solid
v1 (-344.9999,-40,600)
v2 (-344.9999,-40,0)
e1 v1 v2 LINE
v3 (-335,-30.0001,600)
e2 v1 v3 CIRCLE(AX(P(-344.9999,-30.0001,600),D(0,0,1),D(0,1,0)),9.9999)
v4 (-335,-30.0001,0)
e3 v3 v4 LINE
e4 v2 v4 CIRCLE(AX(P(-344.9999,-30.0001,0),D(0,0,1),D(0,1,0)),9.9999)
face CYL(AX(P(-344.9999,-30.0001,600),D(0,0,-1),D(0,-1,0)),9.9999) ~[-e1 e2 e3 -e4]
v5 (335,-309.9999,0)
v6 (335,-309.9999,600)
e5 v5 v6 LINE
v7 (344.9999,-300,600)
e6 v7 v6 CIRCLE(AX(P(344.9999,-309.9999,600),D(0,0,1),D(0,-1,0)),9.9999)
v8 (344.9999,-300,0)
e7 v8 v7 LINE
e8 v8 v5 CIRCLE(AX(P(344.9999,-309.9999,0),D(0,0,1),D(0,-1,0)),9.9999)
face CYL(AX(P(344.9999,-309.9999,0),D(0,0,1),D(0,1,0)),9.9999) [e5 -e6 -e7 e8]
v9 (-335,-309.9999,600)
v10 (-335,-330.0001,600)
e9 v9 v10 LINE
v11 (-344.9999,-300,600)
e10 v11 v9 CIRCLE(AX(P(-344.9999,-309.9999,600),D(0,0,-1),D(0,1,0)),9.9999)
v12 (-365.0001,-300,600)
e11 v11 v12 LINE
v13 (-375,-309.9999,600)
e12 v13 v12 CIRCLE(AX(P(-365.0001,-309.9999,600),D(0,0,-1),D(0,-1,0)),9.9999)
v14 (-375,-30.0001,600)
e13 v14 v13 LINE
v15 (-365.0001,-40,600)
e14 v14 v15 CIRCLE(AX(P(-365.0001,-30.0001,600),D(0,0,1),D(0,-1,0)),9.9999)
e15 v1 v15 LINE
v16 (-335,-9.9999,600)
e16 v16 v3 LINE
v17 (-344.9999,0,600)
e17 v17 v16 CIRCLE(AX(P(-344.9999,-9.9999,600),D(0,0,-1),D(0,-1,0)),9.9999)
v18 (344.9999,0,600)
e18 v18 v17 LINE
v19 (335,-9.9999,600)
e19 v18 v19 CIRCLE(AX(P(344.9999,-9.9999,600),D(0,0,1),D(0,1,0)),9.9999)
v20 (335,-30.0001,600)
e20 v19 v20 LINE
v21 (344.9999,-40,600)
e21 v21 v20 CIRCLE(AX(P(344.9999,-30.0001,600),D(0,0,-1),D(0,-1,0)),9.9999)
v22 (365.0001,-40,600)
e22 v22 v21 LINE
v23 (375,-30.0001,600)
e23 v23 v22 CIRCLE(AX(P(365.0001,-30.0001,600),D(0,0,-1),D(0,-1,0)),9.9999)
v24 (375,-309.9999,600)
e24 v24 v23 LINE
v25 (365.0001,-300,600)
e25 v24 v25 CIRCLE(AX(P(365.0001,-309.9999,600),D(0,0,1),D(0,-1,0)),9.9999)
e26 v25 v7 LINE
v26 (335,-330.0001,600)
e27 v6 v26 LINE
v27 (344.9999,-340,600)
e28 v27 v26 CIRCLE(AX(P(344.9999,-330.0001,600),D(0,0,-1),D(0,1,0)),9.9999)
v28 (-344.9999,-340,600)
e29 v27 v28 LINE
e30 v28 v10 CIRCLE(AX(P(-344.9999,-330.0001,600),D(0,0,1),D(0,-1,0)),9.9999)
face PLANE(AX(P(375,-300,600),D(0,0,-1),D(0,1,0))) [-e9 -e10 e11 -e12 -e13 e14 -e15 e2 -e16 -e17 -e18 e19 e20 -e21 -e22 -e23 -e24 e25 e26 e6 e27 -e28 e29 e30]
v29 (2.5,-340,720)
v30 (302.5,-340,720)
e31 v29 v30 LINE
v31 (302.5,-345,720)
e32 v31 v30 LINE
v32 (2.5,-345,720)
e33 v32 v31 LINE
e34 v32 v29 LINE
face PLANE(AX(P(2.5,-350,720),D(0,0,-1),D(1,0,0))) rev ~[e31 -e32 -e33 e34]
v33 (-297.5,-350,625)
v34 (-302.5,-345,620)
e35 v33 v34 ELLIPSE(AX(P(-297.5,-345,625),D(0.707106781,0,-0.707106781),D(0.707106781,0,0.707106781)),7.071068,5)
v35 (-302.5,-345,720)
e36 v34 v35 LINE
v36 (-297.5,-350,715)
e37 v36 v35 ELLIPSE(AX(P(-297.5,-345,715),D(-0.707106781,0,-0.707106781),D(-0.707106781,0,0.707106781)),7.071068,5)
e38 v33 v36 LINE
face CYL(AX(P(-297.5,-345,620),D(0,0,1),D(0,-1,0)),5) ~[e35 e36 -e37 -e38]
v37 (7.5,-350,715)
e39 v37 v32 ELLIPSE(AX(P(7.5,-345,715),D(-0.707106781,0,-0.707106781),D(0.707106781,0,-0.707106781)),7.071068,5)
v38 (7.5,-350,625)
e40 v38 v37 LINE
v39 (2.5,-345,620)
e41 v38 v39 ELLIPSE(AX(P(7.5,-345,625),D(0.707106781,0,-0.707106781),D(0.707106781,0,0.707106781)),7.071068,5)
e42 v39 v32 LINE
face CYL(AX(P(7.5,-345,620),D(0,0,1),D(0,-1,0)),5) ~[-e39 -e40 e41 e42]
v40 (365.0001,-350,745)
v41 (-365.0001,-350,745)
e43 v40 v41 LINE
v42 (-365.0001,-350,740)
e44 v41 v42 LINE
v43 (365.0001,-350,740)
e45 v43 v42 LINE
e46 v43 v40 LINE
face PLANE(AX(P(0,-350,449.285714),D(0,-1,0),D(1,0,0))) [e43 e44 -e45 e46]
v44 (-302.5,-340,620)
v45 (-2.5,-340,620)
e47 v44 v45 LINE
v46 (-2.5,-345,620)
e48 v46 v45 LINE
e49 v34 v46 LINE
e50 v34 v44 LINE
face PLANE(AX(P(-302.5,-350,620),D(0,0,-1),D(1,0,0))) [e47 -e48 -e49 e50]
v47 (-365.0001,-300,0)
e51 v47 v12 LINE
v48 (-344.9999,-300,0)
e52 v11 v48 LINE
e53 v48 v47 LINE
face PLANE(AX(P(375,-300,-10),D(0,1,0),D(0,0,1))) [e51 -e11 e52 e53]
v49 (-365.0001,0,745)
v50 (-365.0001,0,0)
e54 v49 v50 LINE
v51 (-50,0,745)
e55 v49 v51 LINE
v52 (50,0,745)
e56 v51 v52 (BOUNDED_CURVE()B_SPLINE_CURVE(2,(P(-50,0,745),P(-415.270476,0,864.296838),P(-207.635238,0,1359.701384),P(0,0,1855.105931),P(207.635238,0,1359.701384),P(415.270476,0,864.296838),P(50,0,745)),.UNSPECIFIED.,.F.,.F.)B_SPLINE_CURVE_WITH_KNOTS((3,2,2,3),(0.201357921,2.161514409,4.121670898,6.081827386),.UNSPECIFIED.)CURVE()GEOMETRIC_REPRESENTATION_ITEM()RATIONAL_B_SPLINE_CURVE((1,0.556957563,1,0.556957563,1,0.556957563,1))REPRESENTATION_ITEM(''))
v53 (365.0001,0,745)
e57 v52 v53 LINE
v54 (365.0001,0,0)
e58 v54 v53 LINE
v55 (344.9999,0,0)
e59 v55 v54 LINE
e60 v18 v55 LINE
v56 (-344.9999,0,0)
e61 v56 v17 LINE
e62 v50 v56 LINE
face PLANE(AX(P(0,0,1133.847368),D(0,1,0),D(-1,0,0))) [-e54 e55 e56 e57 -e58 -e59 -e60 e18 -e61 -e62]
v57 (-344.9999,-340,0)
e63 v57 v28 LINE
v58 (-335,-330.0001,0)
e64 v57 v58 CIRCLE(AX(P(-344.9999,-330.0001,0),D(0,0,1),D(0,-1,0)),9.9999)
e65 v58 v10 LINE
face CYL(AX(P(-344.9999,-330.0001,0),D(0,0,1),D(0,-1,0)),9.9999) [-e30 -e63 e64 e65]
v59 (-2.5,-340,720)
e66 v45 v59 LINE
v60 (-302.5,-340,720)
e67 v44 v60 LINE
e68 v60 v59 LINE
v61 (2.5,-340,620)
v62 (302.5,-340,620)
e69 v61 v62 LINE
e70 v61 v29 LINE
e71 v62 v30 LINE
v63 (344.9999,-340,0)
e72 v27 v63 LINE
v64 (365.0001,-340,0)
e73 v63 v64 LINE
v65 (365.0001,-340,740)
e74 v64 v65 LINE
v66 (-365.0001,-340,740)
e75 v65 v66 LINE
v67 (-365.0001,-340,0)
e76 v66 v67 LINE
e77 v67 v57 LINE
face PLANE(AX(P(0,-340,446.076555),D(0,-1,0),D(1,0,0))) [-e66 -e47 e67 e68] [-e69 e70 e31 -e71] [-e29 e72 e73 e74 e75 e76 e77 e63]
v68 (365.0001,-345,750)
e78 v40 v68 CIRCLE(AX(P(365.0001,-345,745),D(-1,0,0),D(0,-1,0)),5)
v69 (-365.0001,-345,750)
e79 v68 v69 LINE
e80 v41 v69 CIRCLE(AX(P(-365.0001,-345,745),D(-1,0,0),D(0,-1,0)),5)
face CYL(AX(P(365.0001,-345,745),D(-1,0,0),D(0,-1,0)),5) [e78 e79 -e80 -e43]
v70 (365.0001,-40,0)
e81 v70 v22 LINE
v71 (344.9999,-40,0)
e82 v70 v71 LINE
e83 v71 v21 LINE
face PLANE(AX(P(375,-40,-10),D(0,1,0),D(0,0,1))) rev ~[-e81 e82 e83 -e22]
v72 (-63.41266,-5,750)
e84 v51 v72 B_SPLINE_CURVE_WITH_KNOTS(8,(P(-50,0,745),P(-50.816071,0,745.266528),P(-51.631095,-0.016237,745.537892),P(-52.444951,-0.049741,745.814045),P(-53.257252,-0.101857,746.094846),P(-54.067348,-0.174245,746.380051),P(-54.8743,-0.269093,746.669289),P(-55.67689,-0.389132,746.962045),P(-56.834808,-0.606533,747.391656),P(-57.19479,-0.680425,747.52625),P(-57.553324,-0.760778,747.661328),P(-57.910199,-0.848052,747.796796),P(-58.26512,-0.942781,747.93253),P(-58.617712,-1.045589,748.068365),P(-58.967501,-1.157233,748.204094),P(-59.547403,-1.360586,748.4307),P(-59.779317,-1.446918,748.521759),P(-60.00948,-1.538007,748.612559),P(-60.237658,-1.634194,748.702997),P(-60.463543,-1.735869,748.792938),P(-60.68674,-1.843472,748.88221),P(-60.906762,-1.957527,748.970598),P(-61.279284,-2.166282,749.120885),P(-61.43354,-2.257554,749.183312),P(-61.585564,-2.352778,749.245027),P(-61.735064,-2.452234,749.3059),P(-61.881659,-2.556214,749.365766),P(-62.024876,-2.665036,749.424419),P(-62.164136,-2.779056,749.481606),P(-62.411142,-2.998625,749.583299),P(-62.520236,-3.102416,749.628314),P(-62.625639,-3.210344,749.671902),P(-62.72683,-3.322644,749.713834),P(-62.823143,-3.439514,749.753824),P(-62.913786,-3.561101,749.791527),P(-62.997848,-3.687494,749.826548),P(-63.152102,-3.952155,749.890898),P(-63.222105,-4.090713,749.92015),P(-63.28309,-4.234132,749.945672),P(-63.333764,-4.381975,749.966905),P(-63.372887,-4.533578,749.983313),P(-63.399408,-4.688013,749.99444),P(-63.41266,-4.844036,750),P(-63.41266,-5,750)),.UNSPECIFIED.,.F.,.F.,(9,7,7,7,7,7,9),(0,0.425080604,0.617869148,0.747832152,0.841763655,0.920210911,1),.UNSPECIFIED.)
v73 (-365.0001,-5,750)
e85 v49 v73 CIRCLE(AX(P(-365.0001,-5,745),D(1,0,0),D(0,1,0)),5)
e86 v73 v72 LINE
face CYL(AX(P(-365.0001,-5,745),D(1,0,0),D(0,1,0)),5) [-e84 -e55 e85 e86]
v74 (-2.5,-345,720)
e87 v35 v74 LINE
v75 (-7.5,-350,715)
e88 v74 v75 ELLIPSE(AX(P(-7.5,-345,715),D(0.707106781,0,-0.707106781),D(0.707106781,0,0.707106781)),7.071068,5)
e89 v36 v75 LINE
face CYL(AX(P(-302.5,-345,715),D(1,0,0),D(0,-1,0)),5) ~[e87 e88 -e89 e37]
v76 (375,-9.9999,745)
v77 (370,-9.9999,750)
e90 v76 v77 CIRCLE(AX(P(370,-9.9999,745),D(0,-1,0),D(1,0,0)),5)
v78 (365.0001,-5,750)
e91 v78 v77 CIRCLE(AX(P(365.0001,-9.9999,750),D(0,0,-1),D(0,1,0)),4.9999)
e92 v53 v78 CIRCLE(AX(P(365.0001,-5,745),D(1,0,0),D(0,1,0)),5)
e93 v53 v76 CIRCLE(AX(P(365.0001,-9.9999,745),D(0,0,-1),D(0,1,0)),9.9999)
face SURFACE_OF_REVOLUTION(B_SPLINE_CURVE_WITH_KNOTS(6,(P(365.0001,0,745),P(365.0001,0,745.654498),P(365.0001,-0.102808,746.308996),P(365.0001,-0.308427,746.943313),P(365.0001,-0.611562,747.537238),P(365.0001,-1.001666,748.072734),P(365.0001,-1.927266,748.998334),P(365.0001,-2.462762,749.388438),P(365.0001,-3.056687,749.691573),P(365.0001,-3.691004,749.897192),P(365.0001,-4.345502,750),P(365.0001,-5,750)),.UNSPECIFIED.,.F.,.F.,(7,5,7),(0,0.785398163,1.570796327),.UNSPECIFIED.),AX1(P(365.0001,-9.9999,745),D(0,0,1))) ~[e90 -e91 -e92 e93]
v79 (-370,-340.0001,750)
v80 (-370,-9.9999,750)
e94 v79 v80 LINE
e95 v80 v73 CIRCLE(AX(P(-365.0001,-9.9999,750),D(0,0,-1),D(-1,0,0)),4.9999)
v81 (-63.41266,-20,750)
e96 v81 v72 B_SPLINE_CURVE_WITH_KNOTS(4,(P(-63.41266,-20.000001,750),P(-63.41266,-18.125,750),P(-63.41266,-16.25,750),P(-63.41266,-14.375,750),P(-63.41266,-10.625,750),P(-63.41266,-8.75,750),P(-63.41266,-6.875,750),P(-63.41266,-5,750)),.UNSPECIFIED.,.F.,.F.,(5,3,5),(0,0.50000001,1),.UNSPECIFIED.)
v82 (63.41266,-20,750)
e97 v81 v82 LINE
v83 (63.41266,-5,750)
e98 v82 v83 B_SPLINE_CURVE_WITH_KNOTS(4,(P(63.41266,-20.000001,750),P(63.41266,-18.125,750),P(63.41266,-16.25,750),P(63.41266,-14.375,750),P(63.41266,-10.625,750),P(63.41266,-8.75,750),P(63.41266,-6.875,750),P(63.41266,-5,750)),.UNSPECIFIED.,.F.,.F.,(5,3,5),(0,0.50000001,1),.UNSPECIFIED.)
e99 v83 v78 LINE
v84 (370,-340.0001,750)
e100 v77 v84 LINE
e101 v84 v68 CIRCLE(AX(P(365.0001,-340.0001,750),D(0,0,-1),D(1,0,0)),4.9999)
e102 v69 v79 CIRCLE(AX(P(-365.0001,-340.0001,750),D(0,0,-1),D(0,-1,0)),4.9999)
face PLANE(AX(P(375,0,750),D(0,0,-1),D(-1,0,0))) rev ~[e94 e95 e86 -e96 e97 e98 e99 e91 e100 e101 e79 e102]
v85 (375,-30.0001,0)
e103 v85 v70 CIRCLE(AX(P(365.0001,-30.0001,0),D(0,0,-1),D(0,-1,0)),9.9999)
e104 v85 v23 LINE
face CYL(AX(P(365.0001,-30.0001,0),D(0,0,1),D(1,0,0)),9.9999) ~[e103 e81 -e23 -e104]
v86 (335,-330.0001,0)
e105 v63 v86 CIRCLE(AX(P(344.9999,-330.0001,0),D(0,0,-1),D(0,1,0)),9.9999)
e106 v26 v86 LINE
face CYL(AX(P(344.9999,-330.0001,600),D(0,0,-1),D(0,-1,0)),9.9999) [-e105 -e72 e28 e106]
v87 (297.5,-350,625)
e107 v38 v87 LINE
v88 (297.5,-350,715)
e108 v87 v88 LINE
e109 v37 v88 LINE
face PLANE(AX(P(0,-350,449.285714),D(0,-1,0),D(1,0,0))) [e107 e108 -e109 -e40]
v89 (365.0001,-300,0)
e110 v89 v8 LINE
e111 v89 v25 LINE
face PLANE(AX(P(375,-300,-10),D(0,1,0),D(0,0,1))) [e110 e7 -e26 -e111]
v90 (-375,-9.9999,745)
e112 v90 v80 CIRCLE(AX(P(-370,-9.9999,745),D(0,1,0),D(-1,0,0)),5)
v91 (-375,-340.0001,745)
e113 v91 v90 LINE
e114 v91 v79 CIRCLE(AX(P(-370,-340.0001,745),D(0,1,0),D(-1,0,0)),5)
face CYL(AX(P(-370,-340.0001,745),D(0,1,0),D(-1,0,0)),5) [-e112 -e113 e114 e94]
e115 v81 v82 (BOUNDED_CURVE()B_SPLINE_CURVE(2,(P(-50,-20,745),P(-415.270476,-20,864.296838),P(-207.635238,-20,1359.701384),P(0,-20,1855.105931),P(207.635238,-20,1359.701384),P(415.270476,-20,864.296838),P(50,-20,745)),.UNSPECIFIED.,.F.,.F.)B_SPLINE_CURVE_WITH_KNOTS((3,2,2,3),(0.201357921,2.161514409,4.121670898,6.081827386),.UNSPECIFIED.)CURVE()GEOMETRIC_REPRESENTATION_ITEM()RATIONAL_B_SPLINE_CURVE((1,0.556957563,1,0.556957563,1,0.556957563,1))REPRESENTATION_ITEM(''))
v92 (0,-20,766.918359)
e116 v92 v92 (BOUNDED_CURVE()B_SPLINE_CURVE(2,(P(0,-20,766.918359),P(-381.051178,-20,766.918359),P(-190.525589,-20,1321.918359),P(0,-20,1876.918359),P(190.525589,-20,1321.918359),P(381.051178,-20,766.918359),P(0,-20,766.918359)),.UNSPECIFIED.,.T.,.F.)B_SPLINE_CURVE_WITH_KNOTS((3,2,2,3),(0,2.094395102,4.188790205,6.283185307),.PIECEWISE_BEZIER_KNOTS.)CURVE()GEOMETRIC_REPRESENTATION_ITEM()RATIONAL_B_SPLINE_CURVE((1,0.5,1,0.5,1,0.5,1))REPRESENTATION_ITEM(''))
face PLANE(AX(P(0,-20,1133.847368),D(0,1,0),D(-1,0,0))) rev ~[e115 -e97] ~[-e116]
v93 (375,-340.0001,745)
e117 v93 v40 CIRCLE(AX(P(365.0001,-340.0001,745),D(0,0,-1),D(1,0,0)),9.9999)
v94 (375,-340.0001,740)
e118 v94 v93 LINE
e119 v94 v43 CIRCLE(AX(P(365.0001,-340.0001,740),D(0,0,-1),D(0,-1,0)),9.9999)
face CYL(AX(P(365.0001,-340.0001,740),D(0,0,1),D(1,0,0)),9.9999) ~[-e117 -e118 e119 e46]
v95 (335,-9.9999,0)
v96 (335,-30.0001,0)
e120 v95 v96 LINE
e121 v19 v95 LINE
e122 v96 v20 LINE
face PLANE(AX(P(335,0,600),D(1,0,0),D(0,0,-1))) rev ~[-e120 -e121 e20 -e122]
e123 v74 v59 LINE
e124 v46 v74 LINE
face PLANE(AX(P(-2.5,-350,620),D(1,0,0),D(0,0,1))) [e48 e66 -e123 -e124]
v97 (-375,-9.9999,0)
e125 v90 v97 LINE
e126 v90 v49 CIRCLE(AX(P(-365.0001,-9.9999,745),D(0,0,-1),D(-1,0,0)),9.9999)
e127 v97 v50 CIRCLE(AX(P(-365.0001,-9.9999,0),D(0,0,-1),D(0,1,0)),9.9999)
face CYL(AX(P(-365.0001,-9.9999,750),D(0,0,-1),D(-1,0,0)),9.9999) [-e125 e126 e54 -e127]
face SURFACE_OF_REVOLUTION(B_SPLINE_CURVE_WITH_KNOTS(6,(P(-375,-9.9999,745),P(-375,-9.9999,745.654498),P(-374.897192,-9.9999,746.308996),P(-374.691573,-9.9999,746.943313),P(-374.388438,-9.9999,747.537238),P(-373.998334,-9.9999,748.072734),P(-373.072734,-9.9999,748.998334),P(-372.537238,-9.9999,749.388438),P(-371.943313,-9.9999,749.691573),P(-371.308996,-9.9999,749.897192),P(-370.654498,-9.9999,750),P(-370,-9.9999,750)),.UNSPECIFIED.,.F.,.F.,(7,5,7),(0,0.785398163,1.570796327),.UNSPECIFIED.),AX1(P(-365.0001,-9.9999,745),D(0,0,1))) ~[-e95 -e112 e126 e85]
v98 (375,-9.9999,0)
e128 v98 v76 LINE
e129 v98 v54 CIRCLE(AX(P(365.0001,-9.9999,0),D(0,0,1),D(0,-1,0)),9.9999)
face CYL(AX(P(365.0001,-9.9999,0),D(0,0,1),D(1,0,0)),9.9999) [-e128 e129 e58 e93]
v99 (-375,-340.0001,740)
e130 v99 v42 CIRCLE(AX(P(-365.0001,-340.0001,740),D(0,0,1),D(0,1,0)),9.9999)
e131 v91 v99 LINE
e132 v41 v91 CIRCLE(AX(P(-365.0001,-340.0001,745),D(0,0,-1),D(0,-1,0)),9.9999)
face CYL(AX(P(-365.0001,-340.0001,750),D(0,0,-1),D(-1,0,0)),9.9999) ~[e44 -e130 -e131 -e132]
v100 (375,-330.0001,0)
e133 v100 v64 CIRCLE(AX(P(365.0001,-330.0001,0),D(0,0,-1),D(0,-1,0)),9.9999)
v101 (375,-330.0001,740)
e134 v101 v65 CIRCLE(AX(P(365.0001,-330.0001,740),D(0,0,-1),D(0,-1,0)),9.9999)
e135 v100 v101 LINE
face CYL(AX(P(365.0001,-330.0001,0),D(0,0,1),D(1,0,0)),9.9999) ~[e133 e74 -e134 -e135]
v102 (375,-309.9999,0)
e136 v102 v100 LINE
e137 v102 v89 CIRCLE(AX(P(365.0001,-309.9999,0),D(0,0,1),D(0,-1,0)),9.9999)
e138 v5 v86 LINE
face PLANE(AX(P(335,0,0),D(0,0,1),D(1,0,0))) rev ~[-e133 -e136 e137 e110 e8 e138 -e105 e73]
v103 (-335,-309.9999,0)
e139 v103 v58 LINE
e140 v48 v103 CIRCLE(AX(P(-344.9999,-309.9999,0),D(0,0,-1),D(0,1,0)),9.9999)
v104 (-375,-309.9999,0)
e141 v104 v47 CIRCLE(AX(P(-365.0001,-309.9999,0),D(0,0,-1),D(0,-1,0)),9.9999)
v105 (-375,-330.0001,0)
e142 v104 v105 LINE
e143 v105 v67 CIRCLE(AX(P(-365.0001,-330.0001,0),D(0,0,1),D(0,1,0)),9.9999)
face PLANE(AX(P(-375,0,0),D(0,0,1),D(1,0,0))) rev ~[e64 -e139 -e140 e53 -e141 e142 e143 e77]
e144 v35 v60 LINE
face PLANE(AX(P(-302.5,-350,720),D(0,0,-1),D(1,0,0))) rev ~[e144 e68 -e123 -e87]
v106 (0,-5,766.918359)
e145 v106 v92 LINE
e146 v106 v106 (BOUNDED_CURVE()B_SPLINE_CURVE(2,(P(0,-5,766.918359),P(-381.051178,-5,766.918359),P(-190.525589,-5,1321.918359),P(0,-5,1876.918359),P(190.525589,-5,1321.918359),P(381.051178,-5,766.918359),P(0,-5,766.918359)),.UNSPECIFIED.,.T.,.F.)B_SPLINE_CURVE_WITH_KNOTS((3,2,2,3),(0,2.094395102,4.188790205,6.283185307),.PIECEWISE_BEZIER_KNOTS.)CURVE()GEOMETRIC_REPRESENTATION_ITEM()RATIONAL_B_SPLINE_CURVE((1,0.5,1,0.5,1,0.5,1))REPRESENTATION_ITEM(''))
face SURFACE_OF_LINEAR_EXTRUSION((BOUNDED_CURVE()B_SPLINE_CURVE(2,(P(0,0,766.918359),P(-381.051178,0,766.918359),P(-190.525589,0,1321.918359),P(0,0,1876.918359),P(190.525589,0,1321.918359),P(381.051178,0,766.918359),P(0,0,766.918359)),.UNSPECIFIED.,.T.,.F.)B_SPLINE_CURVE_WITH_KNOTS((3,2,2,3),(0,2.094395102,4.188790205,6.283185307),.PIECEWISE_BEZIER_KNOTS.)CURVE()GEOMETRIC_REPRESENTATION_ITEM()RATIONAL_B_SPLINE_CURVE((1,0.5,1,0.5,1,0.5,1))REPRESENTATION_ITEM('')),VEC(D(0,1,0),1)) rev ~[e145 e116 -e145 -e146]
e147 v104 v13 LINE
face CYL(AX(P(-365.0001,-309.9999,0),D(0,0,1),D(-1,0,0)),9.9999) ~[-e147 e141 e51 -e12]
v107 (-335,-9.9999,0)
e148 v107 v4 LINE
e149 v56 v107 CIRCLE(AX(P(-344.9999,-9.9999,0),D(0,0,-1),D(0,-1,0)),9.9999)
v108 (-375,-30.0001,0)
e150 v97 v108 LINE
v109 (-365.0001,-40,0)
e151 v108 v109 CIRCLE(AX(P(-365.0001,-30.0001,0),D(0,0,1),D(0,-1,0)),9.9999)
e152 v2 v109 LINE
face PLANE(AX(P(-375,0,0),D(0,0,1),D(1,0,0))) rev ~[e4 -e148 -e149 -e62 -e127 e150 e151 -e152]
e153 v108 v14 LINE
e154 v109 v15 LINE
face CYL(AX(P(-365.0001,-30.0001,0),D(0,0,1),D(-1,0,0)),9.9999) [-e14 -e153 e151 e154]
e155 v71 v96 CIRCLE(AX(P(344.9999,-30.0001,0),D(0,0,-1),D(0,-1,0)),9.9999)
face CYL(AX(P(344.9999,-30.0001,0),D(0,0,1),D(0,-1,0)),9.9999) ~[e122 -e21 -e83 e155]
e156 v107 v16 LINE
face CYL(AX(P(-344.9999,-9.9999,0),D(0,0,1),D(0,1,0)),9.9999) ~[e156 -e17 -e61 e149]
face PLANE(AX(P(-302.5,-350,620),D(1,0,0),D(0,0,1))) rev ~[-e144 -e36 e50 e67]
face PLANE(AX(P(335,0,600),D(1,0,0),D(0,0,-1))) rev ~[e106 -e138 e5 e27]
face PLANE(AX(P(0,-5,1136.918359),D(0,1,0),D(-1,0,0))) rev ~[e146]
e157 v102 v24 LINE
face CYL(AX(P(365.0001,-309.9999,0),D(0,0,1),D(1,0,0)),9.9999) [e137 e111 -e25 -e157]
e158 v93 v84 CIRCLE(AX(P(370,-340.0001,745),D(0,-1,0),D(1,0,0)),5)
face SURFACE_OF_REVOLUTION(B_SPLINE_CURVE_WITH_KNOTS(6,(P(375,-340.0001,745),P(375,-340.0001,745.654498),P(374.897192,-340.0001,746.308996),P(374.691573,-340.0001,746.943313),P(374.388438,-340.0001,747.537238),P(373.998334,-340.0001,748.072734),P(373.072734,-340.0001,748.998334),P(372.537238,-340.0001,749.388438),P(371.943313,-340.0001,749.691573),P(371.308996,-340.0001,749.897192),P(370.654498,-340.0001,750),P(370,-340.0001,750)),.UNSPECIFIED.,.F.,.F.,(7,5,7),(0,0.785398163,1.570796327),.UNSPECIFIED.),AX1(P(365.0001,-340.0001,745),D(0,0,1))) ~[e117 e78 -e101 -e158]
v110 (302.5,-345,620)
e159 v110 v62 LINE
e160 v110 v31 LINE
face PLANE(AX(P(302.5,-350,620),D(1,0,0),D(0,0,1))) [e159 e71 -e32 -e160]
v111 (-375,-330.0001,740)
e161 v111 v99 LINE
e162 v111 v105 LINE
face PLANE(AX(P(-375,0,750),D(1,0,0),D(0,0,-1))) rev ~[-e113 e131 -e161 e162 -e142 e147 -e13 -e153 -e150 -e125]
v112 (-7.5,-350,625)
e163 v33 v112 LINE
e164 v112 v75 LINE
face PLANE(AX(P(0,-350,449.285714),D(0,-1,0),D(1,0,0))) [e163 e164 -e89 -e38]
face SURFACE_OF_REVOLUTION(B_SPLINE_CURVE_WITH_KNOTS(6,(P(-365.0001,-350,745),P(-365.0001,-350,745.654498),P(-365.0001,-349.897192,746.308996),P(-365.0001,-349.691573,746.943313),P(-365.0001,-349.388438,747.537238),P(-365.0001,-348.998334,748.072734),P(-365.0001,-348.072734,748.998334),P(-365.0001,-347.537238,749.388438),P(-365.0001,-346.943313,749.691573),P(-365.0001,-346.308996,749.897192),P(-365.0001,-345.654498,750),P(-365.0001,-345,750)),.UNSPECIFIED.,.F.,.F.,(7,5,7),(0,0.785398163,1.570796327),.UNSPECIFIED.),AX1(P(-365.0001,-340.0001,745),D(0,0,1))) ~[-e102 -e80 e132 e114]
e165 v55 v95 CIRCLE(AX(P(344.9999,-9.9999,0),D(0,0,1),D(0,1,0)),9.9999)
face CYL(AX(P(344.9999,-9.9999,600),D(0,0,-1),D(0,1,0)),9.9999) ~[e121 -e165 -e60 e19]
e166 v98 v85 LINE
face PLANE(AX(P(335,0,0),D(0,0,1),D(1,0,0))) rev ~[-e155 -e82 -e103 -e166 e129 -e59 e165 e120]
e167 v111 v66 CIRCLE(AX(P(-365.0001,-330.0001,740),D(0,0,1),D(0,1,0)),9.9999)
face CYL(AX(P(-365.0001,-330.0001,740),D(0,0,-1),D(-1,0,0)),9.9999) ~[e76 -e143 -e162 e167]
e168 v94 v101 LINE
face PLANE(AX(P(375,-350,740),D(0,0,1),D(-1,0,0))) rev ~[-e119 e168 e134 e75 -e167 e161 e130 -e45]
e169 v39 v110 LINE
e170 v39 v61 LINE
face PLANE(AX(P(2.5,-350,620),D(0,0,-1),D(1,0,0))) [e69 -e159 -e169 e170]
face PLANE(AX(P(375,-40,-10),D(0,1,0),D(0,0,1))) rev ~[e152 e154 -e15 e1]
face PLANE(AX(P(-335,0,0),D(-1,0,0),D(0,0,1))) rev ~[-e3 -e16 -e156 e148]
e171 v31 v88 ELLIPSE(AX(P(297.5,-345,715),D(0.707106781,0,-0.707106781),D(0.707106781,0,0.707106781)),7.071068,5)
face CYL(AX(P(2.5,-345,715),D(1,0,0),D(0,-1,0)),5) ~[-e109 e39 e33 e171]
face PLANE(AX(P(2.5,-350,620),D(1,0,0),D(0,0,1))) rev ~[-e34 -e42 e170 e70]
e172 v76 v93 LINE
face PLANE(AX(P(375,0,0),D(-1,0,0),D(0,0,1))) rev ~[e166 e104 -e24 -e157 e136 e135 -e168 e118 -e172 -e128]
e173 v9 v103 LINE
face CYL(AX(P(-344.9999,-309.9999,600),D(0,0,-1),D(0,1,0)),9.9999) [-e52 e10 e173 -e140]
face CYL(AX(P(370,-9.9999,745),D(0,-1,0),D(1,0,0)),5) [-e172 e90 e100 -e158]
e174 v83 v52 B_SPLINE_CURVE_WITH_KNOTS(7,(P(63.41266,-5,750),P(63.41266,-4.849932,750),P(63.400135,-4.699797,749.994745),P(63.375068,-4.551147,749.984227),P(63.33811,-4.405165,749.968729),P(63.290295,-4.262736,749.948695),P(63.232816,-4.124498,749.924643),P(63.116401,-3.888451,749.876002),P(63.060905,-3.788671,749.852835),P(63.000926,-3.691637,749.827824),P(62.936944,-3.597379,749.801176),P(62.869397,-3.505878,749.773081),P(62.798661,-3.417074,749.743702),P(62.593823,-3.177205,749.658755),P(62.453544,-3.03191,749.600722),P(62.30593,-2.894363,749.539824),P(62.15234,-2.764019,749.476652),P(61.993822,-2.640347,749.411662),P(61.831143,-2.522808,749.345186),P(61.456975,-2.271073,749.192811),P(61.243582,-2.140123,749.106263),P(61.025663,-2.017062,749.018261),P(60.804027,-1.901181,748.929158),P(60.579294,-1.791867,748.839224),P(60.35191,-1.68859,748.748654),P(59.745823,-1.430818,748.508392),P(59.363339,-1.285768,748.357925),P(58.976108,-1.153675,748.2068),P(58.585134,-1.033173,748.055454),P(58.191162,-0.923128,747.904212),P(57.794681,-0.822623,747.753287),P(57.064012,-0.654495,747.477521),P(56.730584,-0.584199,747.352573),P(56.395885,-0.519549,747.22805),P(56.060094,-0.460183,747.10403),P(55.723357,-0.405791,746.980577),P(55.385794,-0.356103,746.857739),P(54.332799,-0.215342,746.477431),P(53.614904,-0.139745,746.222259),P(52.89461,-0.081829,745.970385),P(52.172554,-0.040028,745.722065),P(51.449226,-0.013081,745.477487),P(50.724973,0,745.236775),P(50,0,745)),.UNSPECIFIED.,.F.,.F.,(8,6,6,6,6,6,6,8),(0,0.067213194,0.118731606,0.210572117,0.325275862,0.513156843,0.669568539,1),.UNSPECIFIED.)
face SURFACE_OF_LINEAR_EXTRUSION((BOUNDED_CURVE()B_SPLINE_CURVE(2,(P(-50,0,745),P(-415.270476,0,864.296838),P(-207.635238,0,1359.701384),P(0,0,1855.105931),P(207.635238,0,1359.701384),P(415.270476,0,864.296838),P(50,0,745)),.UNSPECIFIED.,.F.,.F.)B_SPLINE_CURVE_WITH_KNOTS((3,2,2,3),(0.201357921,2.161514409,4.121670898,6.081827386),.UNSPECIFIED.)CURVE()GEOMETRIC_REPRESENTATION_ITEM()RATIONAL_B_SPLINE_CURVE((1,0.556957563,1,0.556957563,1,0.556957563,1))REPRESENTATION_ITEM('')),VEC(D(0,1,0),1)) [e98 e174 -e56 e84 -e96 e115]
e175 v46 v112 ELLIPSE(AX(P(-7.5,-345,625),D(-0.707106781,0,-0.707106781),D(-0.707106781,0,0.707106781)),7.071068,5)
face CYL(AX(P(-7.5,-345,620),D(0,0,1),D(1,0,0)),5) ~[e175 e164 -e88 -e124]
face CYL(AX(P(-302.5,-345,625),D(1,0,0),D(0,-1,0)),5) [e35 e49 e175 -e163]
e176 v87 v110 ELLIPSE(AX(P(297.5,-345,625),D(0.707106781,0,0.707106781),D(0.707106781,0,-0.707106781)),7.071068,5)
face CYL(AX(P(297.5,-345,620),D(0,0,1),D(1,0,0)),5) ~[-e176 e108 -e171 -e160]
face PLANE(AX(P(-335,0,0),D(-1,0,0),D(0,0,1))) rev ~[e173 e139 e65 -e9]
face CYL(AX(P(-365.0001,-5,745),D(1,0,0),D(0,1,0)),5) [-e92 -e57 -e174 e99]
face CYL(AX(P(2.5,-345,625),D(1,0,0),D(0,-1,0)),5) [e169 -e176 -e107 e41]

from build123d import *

# Parameters (mm, degrees)
F1_DEPTH  = 350
F2_W      = 260
F2_H      = 610
F3_DEPTH  = 750.001
F4_W      = 300
F4_H      = 100
F5_DEPTH  = 10
F6_R      = 9.9999
F7_R      = 5
F8_R      = 5
F10_DEPTH = 5
F11_DEPTH = 20


# Not quite as in the source:
# - a fillet or chamfer is up to 0.001 mm smaller than in the source, because OpenCascade refuses the exact size


with BuildPart() as f1:
    # F0 (on Front) → F1 (new body)
    with BuildSketch(Plane.XZ):
        Polygon((375, 750), (-375, 750), (-375, 600), (-375, 0), (-335, 0), (-335, 600), (335, 600), (335, 0), (375, 0), (375, 600), align=None)
    extrude(amount=F1_DEPTH)

    # F2 (on face) → F3 (cut, through all)
    with BuildSketch(Plane.YZ.offset(375)):
        with Locations((-170, 295)):
            Rectangle(F2_W, F2_H)
    extrude(amount=-F3_DEPTH, mode=Mode.SUBTRACT)

    # F4 (on face) → F5 (cut)
    with BuildSketch(Plane.XZ.offset(350)):
        Polygon((375, 740), (-375, 740), (-375, 0), (-335, 0), (-335, 600), (335, 600), (335, 0), (375, 0), align=None)
        with Locations((-152.5, 670)):
            Rectangle(F4_W, F4_H, mode=Mode.SUBTRACT)
        with Locations((152.5, 670)):
            Rectangle(F4_W, F4_H, mode=Mode.SUBTRACT)
    extrude(amount=-F5_DEPTH, mode=Mode.SUBTRACT)

    # F6 (radius 10 in the source; OpenCascade refuses exactly that, so slightly less here)
    f6_edges = [f1.edges().sort_by_distance(p)[0] for p in [
        (-375, 0, 375),
        (-375, -340, 370),
        (375, -340, 370),
        (375, 0, 375),
        (335, -40, 300),
        (335, 0, 300),
        (375, -40, 300),
        (-335, 0, 300),
        (-335, -40, 300),
        (-375, -40, 300),
        (375, -300, 300),
        (335, -300, 300),
        (335, -340, 300),
        (-335, -340, 300),
        (-335, -300, 300),
        (-375, -300, 300),
        (375, -350, 745),
        (-375, -350, 745),
    ]]
    fillet(f6_edges, radius=F6_R)

    # F7
    f7_edges = [f1.edges().sort_by_distance(p)[0] for p in [
        (152.5, -350, 620),
        (302.5, -350, 670),
        (152.5, -350, 720),
        (2.5, -350, 670),
        (-2.5, -350, 670),
        (-152.5, -350, 620),
        (-302.5, -350, 670),
        (-152.5, -350, 720),
    ]]
    fillet(f7_edges, radius=F7_R)

    # F8
    f8_edges = [f1.edges().sort_by_distance(p)[0] for p in [
        (0, -350, 750),
    ]]
    fillet(f8_edges, radius=F8_R)



with BuildPart() as f10:
    # F9 (on face) → F10 (new body)
    with BuildSketch(Plane(origin=(0, 0, 0), x_dir=(-1, 0, 0), z_dir=(0, 1, 0))):
        with BuildLine():
            add(Edge.make_bspline(
                [(0, 766.9183588453), (381.0511776652, 766.9183588453), (190.5255888326, 1321.9183588453), (0, 1876.9183588453), (-190.5255888326, 1321.9183588453), (-381.0511776652, 766.9183588453), (0, 766.9183588453)],
                knots=[0, 0, 0, 2.0943951024, 2.0943951024, 4.1887902048, 4.1887902048, 6.2831853072, 6.2831853072, 6.2831853072], degree=2, weights=[1, 0.5, 1, 0.5, 1, 0.5, 1]))
        make_face()
    extrude(amount=-F10_DEPTH)


with BuildPart() as f1_1:
    add(f1.part)

    add(f10.part)  # F11 merges F10
    # F9 (on face) → F11 (join)
    with BuildSketch(Plane(origin=(0, 0, 0), x_dir=(-1, 0, 0), z_dir=(0, 1, 0))):
        with BuildLine():
            Line((-50, 745), (50, 745))
            add(Edge.make_bspline(
                [(50, 745), (415.2704758851, 864.2968378696), (207.6352379426, 1359.7013842068), (0, 1855.1059305439), (-207.6352379426, 1359.7013842068), (-415.2704758851, 864.2968378696), (-50, 745)],
                knots=[0.2013579208, 0.2013579208, 0.2013579208, 2.1615144093, 2.1615144093, 4.1216708979, 4.1216708979, 6.0818273864, 6.0818273864, 6.0818273864], degree=2, weights=[1, 0.5569575634, 1, 0.5569575634, 1, 0.5569575634, 1]))
        make_face()
        with BuildLine():
            add(Edge.make_bspline(
                [(0, 766.9183588453), (381.0511776652, 766.9183588453), (190.5255888326, 1321.9183588453), (0, 1876.9183588453), (-190.5255888326, 1321.9183588453), (-381.0511776652, 766.9183588453), (0, 766.9183588453)],
                knots=[0, 0, 0, 2.0943951024, 2.0943951024, 4.1887902048, 4.1887902048, 6.2831853072, 6.2831853072, 6.2831853072], degree=2, weights=[1, 0.5, 1, 0.5, 1, 0.5, 1]))
        make_face(mode=Mode.SUBTRACT)
    extrude(amount=-F11_DEPTH)


solid = f1_1.part
